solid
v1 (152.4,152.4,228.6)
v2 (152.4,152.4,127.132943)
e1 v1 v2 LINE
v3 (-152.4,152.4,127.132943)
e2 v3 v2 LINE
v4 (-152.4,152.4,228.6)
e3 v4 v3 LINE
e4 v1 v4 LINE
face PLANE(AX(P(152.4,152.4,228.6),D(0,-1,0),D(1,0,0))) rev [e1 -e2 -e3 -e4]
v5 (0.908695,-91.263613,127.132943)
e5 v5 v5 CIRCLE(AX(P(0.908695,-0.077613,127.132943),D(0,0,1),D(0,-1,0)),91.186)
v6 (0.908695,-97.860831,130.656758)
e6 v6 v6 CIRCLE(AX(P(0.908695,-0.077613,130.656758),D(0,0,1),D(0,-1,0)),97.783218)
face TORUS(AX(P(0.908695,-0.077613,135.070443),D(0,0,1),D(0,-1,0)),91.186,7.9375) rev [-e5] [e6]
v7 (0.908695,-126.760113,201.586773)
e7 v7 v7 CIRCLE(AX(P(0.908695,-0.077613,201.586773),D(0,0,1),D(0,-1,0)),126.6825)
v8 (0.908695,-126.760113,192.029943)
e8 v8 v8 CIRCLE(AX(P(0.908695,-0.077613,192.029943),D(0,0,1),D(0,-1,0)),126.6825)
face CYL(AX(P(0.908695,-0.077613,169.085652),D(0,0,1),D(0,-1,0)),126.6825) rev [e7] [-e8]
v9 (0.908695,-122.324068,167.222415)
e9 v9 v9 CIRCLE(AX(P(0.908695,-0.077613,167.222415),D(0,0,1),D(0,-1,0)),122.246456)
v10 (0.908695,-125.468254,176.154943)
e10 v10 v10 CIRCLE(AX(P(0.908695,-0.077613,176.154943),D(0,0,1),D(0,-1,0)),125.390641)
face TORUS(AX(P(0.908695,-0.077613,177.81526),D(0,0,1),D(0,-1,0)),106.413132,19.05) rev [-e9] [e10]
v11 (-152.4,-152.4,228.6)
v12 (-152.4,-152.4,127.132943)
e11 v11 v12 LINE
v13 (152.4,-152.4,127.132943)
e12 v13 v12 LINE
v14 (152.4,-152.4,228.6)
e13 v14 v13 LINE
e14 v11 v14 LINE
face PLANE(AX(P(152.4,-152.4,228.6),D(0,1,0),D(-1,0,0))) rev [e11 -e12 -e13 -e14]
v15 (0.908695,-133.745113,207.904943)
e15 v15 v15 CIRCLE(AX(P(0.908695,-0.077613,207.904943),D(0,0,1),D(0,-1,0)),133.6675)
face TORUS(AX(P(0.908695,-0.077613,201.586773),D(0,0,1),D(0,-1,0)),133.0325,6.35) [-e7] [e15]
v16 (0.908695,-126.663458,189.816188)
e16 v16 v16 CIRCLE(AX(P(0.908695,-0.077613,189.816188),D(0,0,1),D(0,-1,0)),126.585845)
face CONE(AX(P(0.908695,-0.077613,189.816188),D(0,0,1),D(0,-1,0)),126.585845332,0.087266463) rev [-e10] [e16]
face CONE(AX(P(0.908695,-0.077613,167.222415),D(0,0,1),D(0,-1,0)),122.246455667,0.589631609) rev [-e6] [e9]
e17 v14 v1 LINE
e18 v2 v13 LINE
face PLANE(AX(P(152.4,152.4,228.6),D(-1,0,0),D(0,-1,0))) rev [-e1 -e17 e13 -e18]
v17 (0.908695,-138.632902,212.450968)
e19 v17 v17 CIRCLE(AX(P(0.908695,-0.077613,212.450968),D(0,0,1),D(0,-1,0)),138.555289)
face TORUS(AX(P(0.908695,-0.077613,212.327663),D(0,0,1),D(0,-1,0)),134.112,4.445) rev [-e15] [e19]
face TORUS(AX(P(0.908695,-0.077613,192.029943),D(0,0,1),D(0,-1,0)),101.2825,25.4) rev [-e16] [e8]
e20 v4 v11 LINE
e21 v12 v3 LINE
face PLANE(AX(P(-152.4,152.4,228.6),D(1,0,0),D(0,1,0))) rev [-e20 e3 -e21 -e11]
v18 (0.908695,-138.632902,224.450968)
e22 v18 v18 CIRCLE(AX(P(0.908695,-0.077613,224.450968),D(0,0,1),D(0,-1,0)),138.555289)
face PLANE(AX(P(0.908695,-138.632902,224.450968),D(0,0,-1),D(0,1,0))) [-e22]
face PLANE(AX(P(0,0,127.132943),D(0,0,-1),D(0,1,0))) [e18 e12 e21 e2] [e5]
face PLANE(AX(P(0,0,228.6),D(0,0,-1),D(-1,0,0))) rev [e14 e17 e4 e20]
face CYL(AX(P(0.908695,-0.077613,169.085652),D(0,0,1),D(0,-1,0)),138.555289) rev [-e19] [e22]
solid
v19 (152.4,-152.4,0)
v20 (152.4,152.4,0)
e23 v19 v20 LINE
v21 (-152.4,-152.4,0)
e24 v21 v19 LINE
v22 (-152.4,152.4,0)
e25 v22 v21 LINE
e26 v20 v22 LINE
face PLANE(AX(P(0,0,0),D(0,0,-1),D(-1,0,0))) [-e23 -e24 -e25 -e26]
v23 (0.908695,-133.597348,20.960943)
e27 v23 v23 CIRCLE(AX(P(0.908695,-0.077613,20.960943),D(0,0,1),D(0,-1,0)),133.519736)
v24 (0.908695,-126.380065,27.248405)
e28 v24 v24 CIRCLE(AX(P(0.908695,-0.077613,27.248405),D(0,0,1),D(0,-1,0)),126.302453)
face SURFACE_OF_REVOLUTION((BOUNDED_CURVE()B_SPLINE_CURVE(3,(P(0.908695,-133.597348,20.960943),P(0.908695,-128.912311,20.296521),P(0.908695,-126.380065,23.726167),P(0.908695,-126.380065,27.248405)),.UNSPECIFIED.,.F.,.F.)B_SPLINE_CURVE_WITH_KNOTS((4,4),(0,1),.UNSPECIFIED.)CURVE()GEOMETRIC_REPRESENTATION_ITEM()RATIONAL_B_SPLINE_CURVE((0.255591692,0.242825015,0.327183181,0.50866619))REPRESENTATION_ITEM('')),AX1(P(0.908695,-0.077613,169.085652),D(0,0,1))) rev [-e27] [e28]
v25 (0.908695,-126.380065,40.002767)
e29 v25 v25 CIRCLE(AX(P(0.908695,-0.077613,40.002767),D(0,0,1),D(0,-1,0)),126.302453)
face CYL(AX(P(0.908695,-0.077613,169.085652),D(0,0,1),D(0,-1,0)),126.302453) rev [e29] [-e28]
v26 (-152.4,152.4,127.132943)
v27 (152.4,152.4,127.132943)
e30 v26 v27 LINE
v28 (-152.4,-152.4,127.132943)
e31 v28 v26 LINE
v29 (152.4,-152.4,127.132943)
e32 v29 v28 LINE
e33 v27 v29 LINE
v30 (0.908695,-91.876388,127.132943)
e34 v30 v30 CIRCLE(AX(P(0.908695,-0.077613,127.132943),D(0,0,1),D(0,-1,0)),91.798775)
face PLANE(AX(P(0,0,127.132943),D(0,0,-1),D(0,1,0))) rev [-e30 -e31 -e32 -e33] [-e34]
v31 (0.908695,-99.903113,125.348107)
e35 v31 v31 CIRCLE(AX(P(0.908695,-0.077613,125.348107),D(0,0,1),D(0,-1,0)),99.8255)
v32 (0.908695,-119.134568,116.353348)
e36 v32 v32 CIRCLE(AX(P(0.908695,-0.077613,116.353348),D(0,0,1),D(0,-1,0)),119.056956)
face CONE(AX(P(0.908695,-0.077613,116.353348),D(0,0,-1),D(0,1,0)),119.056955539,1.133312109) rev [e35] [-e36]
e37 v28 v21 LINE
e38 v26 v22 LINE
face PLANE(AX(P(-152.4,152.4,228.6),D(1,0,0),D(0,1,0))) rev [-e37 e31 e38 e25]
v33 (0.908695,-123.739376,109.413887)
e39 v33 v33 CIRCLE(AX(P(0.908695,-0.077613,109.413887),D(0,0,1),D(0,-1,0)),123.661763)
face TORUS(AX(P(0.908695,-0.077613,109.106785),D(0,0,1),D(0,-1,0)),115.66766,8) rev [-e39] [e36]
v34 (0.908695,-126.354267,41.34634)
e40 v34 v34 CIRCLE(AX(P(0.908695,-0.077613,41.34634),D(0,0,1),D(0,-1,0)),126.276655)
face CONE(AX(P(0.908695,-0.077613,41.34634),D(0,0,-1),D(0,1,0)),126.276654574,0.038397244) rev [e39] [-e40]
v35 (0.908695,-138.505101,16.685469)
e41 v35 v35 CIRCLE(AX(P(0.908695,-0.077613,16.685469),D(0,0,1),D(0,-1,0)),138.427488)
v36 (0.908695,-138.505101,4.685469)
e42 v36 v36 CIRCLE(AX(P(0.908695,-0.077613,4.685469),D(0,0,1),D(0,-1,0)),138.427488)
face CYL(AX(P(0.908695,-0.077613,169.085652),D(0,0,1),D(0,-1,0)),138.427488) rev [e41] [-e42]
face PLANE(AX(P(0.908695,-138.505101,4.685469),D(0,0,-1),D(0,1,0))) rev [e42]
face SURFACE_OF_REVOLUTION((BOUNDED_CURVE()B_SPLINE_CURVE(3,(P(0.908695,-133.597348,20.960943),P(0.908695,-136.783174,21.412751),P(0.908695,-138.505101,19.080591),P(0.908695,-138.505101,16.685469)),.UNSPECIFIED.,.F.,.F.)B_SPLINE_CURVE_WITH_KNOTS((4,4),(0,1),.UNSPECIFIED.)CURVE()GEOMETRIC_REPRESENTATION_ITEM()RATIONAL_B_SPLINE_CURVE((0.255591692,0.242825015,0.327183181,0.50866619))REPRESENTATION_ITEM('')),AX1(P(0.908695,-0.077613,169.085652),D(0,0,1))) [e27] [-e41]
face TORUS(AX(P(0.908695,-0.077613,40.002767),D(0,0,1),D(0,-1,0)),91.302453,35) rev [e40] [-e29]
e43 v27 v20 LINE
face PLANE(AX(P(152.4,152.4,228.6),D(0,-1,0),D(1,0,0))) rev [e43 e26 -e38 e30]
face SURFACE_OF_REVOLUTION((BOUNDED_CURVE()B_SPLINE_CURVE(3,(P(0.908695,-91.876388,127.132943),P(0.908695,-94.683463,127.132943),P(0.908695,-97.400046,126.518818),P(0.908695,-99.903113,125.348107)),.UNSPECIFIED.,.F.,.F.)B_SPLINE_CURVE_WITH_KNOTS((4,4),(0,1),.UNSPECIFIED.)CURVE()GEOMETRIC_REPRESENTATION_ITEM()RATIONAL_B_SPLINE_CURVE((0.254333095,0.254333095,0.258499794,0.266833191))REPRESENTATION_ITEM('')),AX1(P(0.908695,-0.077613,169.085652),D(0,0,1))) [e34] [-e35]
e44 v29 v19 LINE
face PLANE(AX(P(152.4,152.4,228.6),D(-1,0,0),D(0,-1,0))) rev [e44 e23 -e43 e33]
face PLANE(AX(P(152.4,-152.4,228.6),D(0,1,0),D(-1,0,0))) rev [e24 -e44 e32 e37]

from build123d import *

# Parameters (mm, degrees)
SKETCH1_W           = 304.8
SKETCH1_H           = 304.8
BOSS_EXTRUDE1_DEPTH = 228.6
CAVITY1_OUTLINE_W   = 8.026725253
CAVITY1_OUTLINE_H   = 98.099701296
CAVITY1_OUTLINE_W_2 = 91.798775
CAVITY1_OUTLINE_W_3 = 26.476952247
CAVITY1_OUTLINE_H_2 = 10.562936239
CAVITY1_OUTLINE_H_3 = 12
CAVITY1_OUTLINE_W_4 = 0.3800475
CAVITY1_OUTLINE_W_5 = 11.74498794


# Read off the part's stored shape, not the designer's step: Cavity1
with BuildPart() as part:
    # Sketch1 → Boss-Extrude1 (new body)
    with BuildSketch(Plane.XY):
        Rectangle(SKETCH1_W, SKETCH1_H)
    extrude(amount=BOSS_EXTRUDE1_DEPTH)

    # Cavity1 outline → Cavity1 (revolve, cut)
    with BuildSketch(Plane(origin=(0.908695262, -0.077612753, 0), x_dir=(1, 0, 0), z_dir=(0, -1, 0))):
        Polygon((91.798775, 125.348106713), (91.798775, 127.13294337), (91.186, 127.13294337), (0, 127.13294337), (0, 125.348106713), align=None)
        with BuildLine():
            add(Edge.make_bspline(
                [(91.798775, 127.13294337), (94.605850649, 127.13294337), (97.322433085, 126.518818237), (99.825500253, 125.348106713)],
                knots=[0, 0, 0, 0, 1, 1, 1, 1], degree=3, weights=[0.254333095, 0.254333095, 0.258499794, 0.266833191]))
            Line((91.798775, 127.13294337), (91.798775, 125.348106713))
            Line((91.798775, 125.348106713), (99.825500253, 125.348106713))
        make_face()
        with Locations((95.812137627, 76.298256065)):
            Rectangle(CAVITY1_OUTLINE_W, CAVITY1_OUTLINE_H)
        with BuildLine():
            Line((119.056955539, 116.353347558), (99.825500253, 125.348106713))
            Line((99.825500253, 125.348106713), (99.825500253, 27.248405417))
            Line((99.825500253, 27.248405417), (126.3024525, 27.248405417))
            Line((126.3024525, 27.248405417), (126.3024525, 40.002766714))
            ThreePointArc((126.3024525, 40.002766714), (126.296002424, 40.674677198), (126.276654574, 41.346340032))
            Line((126.276654574, 41.346340032), (123.66176318, 109.413887071))
            ThreePointArc((123.66176318, 109.413887071), (122.333578486, 113.530078475), (119.056955539, 116.353347558))
        make_face()
        with BuildLine():
            Line((0, 127.13294337), (91.186, 127.13294337))
            ThreePointArc((91.186, 127.13294337), (91.49261635, 127.138867697), (91.798775, 127.156631833))
            Line((91.798775, 127.156631833), (91.798775, 224.450968055))
            Line((91.798775, 224.450968055), (0, 224.450968055))
            Line((0, 224.450968055), (0, 127.13294337))
        make_face()
        with Locations((45.8993875, 76.298256065)):
            Rectangle(CAVITY1_OUTLINE_W_2, CAVITY1_OUTLINE_H)
        with BuildLine():
            Line((91.798775, 224.450968055), (91.798775, 127.156631833))
            ThreePointArc((91.798775, 127.156631833), (95.19333333, 128.21878767), (97.783218052, 130.65675781))
            Line((97.783218052, 130.65675781), (99.825500253, 133.709395072))
            Line((99.825500253, 133.709395072), (99.825500253, 224.450968055))
            Line((99.825500253, 224.450968055), (91.798775, 224.450968055))
        make_face()
        with Locations((113.063976376, 21.966937298)):
            Rectangle(CAVITY1_OUTLINE_W_3, CAVITY1_OUTLINE_H_2)
        with Locations((95.812137627, 21.966937298)):
            Rectangle(CAVITY1_OUTLINE_W, CAVITY1_OUTLINE_H_2)
        with BuildLine():
            Line((99.825500253, 224.450968055), (99.825500253, 133.709395072))
            Line((99.825500253, 133.709395072), (122.246455667, 167.222414925))
            ThreePointArc((122.246455667, 167.222414925), (124.382440282, 171.490193303), (125.39064134, 176.15494337))
            Line((125.39064134, 176.15494337), (126.3024525, 186.576992614))
            Line((126.3024525, 186.576992614), (126.3024525, 224.450968055))
            Line((126.3024525, 224.450968055), (99.825500253, 224.450968055))
        make_face()
        with Locations((45.8993875, 21.966937298)):
            Rectangle(CAVITY1_OUTLINE_W_2, CAVITY1_OUTLINE_H_2)
        with Locations((113.063976376, 10.685469178)):
            Rectangle(CAVITY1_OUTLINE_W_3, CAVITY1_OUTLINE_H_3)
        with Locations((95.812137627, 10.685469178)):
            Rectangle(CAVITY1_OUTLINE_W, CAVITY1_OUTLINE_H_3)
        with BuildLine():
            add(Edge.make_bspline(
                [(126.6825, 25.081421339), (126.418277303, 25.811394544), (126.3024525, 26.54497243), (126.3024525, 27.248405417)],
                knots=[0.72047601, 0.72047601, 0.72047601, 0.72047601, 1, 1, 1, 1], degree=3, weights=[0.379245784, 0.4147972, 0.457937335, 0.50866619]))
            Line((126.3024525, 27.248405417), (126.3024525, 16.685469178))
            Line((126.3024525, 16.685469178), (126.6825, 16.685469178))
            Line((126.6825, 16.685469178), (126.6825, 25.081421339))
        make_face()
        with BuildLine():
            Line((126.3024525, 224.450968055), (126.3024525, 186.576992614))
            Line((126.3024525, 186.576992614), (126.585845332, 189.816187504))
            ThreePointArc((126.585845332, 189.816187504), (126.658324828, 190.922010931), (126.6825, 192.02994337))
            Line((126.6825, 192.02994337), (126.6825, 201.586773144))
            Line((126.6825, 201.586773144), (126.6825, 224.450968055))
            Line((126.6825, 224.450968055), (126.3024525, 224.450968055))
        make_face()
        with Locations((45.8993875, 10.685469178)):
            Rectangle(CAVITY1_OUTLINE_W_2, CAVITY1_OUTLINE_H_3)
        with Locations((126.49247625, 10.685469178)):
            Rectangle(CAVITY1_OUTLINE_W_4, CAVITY1_OUTLINE_H_3)
        with BuildLine():
            add(Edge.make_bspline(
                [(133.5197355, 20.96094337), (130.193166053, 20.489176086), (127.664699974, 22.367878288), (126.6825, 25.081421339)],
                knots=[0, 0, 0, 0, 0.72047601, 0.72047601, 0.72047601, 0.72047601], degree=3, weights=[0.255591692, 0.246393608, 0.287611638, 0.379245784]))
            Line((126.6825, 25.081421339), (126.6825, 16.685469178))
            Line((126.6825, 16.685469178), (138.42748794, 16.685469178))
            add(Edge.make_bspline(
                [(133.5197355, 20.96094337), (136.705561076, 21.412750646), (138.42748794, 19.080591171), (138.42748794, 16.685469178)],
                knots=[0, 0, 0, 0, 1, 1, 1, 1], degree=3, weights=[0.255591692, 0.242825015, 0.327183181, 0.50866619]))
        make_face()
        with Locations((132.55499397, 10.685469178)):
            Rectangle(CAVITY1_OUTLINE_W_5, CAVITY1_OUTLINE_H_3)
        with BuildLine():
            Line((138.42748794, 224.450968055), (126.6825, 224.450968055))
            Line((126.6825, 224.450968055), (126.6825, 201.586773144))
            ThreePointArc((126.6825, 201.586773144), (128.772790503, 206.296059184), (133.6675, 207.90494337))
            ThreePointArc((133.6675, 207.90494337), (136.674112341, 208.695362244), (138.42748794, 211.262491725))
            Line((138.42748794, 211.262491725), (138.42748794, 224.450968055))
        make_face()
        with BuildLine():
            Line((138.42748794, 224.450968055), (138.42748794, 211.262491725))
            ThreePointArc((138.42748794, 211.262491725), (138.5166365, 211.729998491), (138.555289406, 212.204357))
            Line((138.555289406, 212.204357), (138.555289406, 212.450968055))
            Line((138.555289406, 212.450968055), (138.555289406, 224.450968055))
            Line((138.555289406, 224.450968055), (138.42748794, 224.450968055))
        make_face()
        with BuildLine():
            Line((138.555289406, 212.450968055), (138.555289406, 212.204357))
            ThreePointArc((138.555289406, 212.204357), (138.556572331, 212.266003842), (138.557, 212.327662549))
            ThreePointArc((138.557, 212.327662549), (138.556572331, 212.389321235), (138.555289406, 212.450968055))
        make_face()
    revolve(axis=Axis((0.908695262, -0.077612753, 0), (0, 0, 1)), mode=Mode.SUBTRACT)


with BuildPart() as body_2:
    # Split1: the piece on the far side of the plane
    add(part.part)
    split(bisect_by=Plane(origin=(0, 0, 127.13294337), x_dir=(0, -1, 0), z_dir=(0, 0, -1)), keep=Keep.BOTTOM)


with BuildPart() as part_1:
    add(part.part)

    # Split1
    split(bisect_by=Plane(origin=(0, 0, 127.13294337), x_dir=(0, -1, 0), z_dir=(0, 0, -1)), keep=Keep.TOP)


solid = Compound([body_2.part, part_1.part])
